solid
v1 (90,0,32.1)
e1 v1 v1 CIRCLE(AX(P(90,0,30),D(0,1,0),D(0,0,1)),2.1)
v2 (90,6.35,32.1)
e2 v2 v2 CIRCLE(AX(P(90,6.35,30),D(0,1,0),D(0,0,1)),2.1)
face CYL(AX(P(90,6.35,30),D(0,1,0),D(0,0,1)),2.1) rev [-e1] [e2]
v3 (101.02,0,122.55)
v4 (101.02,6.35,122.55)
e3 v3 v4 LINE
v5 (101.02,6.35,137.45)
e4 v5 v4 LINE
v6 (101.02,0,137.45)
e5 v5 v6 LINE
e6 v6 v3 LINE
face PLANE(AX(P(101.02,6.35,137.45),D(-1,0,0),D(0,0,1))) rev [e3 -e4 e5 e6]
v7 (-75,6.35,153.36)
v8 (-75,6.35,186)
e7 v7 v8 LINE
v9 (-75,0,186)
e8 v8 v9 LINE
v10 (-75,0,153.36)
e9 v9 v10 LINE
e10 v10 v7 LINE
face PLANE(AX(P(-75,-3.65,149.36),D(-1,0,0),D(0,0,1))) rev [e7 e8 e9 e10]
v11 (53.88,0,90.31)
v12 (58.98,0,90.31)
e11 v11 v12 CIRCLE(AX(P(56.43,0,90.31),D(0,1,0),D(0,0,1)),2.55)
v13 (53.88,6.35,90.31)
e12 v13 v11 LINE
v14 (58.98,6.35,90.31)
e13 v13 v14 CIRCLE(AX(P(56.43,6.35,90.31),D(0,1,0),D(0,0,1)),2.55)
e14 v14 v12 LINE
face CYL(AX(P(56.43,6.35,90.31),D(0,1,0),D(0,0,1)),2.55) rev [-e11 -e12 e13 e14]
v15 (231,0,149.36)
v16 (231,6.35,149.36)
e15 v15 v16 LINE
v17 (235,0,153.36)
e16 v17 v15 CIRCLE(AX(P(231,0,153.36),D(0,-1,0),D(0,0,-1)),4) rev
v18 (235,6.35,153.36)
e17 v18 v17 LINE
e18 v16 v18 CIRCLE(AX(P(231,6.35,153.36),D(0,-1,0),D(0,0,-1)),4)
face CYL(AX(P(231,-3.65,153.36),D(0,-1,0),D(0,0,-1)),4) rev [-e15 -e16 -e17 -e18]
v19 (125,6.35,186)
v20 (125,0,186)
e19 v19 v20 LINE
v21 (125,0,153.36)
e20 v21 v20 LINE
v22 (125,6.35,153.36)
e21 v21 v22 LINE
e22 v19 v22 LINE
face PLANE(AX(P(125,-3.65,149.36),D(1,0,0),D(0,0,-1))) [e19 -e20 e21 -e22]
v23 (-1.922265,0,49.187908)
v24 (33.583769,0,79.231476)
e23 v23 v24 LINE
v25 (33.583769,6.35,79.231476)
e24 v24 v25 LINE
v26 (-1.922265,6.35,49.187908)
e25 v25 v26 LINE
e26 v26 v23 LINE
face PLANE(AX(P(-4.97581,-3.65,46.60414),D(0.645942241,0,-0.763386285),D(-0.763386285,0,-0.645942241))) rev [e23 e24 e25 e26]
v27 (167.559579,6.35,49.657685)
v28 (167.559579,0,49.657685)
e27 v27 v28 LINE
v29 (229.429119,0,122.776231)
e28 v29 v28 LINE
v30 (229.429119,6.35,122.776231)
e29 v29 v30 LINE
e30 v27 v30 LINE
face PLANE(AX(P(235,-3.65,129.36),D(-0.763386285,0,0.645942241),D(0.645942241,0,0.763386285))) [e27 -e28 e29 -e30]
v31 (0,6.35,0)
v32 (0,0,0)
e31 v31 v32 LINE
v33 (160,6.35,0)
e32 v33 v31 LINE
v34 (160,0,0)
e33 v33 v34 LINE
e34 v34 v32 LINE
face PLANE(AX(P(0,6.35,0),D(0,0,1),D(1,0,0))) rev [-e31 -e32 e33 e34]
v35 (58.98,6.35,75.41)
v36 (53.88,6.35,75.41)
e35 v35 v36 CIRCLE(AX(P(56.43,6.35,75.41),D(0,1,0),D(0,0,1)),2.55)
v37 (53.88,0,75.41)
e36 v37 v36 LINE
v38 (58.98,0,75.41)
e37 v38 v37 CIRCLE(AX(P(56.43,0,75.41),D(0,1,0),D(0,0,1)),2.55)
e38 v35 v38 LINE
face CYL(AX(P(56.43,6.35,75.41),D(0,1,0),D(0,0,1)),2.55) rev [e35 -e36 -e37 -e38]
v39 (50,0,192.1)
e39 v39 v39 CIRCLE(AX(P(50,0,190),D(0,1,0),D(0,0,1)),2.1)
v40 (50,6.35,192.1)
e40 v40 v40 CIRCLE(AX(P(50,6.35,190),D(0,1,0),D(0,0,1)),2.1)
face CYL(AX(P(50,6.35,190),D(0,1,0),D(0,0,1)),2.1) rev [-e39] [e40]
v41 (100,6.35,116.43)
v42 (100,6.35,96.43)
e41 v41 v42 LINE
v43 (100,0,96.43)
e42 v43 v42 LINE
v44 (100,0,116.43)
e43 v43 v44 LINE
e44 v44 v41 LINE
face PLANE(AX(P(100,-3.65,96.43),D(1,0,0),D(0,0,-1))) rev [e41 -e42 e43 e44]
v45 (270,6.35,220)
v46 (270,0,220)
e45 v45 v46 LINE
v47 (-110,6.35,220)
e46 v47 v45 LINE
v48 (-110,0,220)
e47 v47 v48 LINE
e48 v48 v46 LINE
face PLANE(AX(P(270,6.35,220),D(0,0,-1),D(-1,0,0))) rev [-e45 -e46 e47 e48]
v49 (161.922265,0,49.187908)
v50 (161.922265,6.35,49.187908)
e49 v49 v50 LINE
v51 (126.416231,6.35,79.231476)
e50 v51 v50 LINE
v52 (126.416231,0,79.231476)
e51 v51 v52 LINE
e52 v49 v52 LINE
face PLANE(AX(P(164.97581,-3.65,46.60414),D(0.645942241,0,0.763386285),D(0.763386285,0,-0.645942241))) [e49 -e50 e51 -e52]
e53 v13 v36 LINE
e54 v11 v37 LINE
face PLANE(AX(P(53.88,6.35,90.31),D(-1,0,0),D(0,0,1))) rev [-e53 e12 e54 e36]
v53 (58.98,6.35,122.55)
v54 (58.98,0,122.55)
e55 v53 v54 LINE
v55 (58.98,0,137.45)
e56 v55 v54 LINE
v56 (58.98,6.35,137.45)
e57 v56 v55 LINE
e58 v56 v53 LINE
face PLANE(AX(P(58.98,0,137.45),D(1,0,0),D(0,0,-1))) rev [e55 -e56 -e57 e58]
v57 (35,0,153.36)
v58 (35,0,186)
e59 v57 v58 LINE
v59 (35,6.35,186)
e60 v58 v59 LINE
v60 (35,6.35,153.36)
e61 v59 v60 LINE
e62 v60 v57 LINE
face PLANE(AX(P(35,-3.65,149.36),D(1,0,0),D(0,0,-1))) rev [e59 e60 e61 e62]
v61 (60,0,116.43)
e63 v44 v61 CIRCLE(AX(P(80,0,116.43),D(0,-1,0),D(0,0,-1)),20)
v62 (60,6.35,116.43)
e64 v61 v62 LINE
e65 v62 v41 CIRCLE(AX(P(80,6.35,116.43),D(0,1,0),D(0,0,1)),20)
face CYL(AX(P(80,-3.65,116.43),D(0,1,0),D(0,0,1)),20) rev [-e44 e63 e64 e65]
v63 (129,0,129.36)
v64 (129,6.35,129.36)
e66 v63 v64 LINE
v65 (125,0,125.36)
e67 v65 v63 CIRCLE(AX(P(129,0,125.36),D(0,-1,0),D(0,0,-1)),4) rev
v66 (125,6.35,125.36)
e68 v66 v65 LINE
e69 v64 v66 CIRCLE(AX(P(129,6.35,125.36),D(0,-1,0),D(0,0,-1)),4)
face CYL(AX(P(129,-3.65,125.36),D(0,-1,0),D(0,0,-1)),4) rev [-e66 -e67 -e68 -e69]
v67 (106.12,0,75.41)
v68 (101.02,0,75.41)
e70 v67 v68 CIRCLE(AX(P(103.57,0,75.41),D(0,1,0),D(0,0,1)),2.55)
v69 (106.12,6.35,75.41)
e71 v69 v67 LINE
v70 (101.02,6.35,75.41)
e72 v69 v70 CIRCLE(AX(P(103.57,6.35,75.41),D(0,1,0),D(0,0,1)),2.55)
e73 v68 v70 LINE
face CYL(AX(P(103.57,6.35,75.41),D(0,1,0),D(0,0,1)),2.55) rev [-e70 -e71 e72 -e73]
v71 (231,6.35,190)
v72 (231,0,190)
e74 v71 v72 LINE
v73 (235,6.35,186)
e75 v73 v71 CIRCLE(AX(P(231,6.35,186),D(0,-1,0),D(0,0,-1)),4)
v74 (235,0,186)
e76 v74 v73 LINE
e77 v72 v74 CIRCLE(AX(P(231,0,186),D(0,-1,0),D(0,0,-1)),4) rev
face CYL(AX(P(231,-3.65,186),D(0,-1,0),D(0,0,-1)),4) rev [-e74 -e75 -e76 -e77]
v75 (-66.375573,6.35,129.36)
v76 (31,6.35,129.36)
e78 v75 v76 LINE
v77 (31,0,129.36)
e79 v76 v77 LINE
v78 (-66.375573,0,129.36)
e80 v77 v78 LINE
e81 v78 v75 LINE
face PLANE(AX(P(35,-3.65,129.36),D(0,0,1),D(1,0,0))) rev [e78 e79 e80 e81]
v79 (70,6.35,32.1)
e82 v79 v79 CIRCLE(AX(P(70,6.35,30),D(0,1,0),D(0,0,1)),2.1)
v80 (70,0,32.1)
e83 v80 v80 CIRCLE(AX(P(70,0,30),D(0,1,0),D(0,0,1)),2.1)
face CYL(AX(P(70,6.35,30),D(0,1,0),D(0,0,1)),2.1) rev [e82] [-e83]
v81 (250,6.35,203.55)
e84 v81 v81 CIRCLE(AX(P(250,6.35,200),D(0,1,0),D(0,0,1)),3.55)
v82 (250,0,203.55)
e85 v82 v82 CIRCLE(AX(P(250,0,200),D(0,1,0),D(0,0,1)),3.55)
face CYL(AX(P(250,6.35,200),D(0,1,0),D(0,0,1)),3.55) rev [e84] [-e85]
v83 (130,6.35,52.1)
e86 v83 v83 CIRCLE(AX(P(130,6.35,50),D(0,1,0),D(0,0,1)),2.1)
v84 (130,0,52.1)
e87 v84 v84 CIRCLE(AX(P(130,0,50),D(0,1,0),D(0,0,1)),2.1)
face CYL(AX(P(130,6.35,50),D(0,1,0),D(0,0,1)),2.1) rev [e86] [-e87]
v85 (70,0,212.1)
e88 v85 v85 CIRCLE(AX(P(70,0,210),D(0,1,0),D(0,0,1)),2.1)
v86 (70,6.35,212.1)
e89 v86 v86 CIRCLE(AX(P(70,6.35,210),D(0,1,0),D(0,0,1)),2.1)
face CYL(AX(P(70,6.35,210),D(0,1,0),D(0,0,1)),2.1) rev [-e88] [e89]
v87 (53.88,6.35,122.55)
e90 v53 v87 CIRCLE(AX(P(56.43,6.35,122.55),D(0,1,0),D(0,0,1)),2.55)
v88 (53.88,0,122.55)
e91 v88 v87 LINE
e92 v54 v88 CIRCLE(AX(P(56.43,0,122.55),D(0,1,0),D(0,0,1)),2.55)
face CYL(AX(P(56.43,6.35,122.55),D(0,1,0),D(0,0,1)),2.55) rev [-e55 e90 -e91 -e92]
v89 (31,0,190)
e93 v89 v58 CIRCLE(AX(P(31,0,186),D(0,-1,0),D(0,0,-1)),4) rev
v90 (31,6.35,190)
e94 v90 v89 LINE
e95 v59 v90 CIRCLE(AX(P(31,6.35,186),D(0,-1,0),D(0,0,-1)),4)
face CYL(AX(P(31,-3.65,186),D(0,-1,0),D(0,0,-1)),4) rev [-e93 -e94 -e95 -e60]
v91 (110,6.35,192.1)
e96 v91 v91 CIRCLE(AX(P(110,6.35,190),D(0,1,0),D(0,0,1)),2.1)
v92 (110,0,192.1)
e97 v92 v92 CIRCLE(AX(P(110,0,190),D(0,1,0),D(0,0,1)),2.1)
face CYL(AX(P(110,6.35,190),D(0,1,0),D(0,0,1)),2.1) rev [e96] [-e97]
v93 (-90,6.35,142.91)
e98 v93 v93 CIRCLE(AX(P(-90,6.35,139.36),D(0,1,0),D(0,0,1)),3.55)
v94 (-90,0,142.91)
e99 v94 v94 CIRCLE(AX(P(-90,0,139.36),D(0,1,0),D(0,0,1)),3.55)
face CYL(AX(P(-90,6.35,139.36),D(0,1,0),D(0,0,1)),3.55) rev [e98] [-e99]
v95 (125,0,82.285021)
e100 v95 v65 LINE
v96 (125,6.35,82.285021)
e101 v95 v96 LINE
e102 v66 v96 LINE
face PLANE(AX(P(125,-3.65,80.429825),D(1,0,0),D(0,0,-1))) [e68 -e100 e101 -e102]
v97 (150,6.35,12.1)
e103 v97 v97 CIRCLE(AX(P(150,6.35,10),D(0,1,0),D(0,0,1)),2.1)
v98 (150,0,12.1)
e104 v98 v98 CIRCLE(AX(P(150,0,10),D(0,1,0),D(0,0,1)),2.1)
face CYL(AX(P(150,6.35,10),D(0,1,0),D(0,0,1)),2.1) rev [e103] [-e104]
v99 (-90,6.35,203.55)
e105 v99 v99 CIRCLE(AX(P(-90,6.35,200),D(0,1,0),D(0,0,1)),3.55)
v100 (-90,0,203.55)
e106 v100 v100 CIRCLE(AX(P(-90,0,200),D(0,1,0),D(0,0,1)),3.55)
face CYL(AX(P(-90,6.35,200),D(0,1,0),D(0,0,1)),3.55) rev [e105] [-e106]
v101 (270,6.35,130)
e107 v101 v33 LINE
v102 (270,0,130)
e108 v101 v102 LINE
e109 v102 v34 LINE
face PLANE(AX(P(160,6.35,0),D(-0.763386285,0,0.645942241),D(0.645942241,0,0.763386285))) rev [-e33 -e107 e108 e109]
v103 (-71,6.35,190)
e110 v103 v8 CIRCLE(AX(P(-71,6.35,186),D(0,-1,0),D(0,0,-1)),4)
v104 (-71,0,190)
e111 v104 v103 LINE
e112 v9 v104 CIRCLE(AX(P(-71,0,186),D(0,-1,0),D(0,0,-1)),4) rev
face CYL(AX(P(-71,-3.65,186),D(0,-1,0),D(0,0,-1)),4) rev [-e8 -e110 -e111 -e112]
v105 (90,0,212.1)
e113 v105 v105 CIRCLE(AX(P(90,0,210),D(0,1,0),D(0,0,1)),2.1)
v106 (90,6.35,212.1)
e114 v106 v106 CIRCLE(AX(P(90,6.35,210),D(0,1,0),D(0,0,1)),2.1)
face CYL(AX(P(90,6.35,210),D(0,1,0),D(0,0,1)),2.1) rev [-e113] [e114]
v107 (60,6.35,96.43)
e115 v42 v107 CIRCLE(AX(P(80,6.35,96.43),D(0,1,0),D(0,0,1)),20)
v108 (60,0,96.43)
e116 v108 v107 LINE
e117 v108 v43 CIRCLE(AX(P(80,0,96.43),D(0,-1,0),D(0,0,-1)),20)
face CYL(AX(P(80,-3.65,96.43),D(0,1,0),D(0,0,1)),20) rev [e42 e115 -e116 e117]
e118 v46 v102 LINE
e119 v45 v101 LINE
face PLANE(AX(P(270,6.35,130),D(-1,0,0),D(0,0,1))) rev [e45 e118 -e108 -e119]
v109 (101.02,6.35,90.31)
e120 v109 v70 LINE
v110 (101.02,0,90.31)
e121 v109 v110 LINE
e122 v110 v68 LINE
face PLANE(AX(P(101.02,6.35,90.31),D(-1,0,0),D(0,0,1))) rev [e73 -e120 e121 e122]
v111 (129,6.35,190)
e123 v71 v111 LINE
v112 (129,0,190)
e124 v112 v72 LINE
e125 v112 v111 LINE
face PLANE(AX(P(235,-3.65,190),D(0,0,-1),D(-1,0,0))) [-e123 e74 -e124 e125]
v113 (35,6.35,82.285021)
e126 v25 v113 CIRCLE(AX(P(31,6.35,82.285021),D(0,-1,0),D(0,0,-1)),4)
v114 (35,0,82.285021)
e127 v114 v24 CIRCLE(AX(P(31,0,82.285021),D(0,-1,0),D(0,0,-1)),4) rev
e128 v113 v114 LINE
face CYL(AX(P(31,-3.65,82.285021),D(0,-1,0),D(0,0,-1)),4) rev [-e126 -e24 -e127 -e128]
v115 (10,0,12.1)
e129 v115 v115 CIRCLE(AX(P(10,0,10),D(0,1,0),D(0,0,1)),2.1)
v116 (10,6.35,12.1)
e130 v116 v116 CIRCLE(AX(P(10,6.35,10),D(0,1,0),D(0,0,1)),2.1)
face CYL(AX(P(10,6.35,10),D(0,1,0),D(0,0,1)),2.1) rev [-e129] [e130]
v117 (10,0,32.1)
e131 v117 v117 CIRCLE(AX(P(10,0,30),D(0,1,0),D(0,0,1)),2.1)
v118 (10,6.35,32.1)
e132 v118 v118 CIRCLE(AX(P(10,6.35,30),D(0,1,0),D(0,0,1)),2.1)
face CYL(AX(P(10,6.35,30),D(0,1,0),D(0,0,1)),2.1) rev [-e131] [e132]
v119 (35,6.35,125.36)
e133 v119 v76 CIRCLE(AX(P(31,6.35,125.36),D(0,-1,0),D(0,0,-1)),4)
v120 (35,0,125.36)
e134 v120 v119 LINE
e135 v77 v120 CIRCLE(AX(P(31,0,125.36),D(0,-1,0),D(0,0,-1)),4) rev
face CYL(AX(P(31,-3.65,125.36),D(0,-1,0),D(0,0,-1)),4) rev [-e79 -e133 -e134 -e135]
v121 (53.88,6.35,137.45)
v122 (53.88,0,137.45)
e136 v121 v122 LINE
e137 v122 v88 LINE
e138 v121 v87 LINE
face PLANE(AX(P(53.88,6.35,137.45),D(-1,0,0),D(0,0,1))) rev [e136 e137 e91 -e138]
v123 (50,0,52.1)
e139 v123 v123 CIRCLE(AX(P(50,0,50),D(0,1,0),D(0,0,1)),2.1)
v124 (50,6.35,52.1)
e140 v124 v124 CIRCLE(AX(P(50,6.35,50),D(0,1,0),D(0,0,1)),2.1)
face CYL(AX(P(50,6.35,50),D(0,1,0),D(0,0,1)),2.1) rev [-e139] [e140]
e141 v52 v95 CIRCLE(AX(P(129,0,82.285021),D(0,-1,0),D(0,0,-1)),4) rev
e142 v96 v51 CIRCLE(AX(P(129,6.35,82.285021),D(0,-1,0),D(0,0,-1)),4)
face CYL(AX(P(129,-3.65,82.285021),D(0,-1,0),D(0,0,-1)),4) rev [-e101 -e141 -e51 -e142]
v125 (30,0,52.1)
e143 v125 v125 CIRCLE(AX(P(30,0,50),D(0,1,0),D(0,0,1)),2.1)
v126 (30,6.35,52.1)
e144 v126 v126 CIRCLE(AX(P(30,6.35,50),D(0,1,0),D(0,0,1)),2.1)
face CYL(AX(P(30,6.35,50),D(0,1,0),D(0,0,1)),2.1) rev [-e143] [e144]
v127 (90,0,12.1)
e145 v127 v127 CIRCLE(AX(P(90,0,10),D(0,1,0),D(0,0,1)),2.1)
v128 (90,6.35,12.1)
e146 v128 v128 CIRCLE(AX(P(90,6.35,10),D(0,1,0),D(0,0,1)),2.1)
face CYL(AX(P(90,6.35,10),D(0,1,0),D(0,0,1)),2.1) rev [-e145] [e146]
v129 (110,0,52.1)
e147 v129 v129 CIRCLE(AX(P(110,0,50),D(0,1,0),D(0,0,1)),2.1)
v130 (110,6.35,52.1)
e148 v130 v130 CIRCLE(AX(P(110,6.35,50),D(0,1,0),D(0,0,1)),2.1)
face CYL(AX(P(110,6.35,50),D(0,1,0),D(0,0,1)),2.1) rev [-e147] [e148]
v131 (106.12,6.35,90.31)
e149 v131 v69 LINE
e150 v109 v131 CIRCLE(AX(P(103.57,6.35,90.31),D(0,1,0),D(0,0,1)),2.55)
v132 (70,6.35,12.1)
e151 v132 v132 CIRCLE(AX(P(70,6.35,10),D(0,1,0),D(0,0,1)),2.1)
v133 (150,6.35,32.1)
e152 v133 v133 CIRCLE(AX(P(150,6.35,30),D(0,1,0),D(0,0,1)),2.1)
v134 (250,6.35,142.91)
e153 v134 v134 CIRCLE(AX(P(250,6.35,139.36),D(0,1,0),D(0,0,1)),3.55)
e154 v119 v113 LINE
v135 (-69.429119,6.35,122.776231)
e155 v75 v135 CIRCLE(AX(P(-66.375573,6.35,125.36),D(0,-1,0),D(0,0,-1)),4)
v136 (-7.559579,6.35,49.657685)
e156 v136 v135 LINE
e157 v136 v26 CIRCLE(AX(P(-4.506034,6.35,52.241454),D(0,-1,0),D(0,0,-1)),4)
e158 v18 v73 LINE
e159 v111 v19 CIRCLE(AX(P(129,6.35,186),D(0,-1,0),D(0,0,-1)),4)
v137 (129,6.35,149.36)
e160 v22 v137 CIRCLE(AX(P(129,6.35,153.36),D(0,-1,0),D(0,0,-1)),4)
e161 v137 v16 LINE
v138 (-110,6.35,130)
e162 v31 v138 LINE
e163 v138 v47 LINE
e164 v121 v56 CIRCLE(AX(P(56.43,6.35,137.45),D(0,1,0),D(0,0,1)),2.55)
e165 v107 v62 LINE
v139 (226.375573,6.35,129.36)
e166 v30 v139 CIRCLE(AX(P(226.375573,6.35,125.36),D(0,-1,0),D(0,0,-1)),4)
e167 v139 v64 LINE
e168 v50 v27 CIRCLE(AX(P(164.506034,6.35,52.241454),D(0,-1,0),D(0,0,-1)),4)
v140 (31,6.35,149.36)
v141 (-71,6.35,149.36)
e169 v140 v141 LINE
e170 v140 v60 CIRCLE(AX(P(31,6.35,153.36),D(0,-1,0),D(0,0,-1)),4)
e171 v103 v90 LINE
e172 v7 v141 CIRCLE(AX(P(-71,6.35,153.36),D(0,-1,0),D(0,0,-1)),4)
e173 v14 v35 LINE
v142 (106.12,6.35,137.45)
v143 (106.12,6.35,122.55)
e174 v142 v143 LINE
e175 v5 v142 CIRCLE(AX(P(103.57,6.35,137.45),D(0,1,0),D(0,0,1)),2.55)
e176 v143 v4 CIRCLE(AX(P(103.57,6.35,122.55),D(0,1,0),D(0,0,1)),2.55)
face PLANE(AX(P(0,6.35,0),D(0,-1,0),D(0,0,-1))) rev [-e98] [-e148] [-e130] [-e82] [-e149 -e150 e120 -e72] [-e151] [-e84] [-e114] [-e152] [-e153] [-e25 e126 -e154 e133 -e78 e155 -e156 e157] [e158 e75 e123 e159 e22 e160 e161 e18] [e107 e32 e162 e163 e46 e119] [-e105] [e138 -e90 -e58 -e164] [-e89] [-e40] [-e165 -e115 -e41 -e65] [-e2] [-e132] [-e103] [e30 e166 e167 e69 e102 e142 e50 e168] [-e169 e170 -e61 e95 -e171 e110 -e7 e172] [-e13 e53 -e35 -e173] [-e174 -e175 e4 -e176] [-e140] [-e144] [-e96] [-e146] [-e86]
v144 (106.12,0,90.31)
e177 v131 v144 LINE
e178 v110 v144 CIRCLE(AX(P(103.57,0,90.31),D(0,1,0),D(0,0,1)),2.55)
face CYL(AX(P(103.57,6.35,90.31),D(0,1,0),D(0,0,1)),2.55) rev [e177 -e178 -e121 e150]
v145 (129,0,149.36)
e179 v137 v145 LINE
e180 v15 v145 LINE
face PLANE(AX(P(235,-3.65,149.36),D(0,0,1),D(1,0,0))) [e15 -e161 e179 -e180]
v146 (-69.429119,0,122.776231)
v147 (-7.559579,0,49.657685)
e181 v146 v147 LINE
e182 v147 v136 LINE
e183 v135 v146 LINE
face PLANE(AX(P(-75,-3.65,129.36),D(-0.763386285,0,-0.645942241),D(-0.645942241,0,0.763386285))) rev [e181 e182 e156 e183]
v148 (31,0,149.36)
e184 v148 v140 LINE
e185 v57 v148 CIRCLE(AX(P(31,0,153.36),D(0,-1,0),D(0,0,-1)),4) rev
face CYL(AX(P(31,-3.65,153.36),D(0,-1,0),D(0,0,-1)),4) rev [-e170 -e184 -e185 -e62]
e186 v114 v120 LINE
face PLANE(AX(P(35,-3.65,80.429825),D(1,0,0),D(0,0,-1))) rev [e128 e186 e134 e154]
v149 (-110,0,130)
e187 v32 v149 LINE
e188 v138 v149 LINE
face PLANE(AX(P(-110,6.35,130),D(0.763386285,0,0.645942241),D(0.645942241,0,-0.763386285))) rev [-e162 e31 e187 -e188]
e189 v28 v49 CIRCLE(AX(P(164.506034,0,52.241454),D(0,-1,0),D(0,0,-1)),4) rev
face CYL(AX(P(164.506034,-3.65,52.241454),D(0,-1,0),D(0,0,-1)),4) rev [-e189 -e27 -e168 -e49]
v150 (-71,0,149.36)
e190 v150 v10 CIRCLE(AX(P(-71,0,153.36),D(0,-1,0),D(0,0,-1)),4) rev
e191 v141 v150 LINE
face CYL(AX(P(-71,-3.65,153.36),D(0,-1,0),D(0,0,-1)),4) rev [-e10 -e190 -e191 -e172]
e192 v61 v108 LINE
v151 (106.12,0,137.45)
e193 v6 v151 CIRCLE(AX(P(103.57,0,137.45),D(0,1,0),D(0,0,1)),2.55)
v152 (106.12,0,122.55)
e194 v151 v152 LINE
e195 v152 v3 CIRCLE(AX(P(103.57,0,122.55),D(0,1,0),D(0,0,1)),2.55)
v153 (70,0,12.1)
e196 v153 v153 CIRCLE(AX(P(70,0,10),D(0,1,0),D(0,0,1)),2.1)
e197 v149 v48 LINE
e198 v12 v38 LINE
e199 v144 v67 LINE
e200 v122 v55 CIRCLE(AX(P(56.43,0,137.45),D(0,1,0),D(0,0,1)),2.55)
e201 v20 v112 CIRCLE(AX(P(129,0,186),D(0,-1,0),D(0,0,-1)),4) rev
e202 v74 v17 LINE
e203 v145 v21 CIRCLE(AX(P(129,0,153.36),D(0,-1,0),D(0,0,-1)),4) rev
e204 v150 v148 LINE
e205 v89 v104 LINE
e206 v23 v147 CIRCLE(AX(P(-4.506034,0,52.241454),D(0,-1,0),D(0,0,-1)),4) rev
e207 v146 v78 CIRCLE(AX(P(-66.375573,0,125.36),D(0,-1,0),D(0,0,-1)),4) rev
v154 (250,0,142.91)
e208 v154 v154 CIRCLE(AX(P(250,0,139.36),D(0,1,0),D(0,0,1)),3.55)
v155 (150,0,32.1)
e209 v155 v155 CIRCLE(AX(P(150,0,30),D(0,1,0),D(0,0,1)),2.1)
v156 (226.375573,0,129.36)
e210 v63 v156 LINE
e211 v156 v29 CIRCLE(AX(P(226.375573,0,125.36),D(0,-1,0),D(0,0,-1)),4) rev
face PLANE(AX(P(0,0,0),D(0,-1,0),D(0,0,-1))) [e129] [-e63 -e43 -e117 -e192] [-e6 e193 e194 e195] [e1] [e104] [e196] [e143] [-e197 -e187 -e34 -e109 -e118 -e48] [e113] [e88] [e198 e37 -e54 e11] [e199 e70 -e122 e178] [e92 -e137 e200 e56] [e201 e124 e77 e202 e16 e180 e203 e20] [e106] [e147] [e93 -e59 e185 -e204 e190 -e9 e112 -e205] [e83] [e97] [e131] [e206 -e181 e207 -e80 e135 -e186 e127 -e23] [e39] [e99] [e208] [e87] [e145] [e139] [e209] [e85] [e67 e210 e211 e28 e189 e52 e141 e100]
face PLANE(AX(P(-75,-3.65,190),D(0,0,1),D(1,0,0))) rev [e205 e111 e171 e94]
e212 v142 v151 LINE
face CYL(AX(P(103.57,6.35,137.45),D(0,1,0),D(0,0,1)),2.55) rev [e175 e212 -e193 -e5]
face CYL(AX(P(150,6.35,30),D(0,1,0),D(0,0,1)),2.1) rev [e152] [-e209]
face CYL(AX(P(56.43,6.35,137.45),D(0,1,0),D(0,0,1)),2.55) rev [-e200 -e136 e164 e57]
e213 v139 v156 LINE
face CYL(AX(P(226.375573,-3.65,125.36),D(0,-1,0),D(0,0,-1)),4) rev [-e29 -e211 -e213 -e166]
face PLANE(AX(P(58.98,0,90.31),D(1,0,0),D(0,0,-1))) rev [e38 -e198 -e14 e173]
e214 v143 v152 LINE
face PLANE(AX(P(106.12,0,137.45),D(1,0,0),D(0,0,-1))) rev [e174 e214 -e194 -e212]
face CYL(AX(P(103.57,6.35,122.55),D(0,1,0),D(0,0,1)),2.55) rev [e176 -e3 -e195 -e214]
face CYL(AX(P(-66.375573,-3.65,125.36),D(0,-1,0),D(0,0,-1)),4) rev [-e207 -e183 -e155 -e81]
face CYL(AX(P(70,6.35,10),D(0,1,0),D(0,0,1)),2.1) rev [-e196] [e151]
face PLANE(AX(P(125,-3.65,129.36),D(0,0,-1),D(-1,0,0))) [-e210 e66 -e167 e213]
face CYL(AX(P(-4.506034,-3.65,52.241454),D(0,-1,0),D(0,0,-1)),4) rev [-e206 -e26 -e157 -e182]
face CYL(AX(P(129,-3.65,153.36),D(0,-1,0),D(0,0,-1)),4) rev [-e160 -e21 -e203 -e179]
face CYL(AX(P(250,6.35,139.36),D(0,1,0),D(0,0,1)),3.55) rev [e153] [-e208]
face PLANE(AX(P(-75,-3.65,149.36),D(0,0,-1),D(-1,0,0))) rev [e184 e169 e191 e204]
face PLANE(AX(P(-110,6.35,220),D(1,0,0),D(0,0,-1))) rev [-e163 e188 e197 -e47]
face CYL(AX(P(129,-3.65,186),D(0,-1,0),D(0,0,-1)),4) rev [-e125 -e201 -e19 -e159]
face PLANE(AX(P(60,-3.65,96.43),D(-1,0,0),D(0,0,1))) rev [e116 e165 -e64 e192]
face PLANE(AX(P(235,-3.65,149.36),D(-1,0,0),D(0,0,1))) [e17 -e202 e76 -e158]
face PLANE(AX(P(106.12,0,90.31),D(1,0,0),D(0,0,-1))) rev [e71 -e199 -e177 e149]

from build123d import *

# Parameters (mm, degrees)
BOSS_EXTRUDE1_DEPTH                 = 6.35
M5X0_8_TAPPED_HOLE1_D               = 4.2
F_7_1_7_1_DIAMETER_HOLE1_D          = 7.1
F_5_0MM_CLEARANCE_DOWEL_SLOT2_DEPTH = 6.35
CUT_EXTRUDE1_DEPTH                  = 10
SKETCH18_W                          = 110
SKETCH18_H                          = 40.64
CUT_EXTRUDE2_DEPTH                  = 10
FILLET1_R                           = 4
FILLET1_OF_MIRROR1_R                = 4


# Read off the part's stored shape, not the designer's step: Ø5.0mm Clearance Dowel Slot2
with BuildPart() as part:
    # Sketch1 → Boss-Extrude1 (new body)
    with BuildSketch(Plane(origin=(0, 0, 0), x_dir=(1, 0, 0), z_dir=(0, 1, 0))):
        Polygon((0, 0), (160, 0), (270, -130), (270, -220), (-110, -220), (-110, -130), align=None)
    extrude(amount=BOSS_EXTRUDE1_DEPTH)

    # M5x0.8 Tapped Hole1 (through all)
    with Locations(Plane(origin=(0, 6.35, 0), x_dir=(1, 0, 0), z_dir=(0, 1, 0))):
        with Locations((10, -10), (150, -10), (150, -30), (10, -30), (30, -50), (50, -50), (110, -50), (130, -50), (90, -10), (90, -30), (70, -10), (70, -30), (70, -210), (90, -210), (50, -190), (110, -190)):
            Hole(M5X0_8_TAPPED_HOLE1_D / 2)

    # Ø7.1 (7.1) Diameter Hole1 (through all)
    with Locations(Plane(origin=(0, 6.35, 0), x_dir=(1, 0, 0), z_dir=(0, 1, 0))):
        with Locations((250, -139.36), (250, -200), (-90, -200), (-90, -139.36)):
            Hole(F_7_1_7_1_DIAMETER_HOLE1_D / 2)

    # Ø5.0mm Clearance Dowel Slot2 outline → Ø5.0mm Clearance Dowel Slot2 (cut)
    with BuildSketch(Plane(origin=(0, 0, 0), x_dir=(1, 0, 0), z_dir=(0, 1, 0))):
        with BuildLine():
            Line((58.98, -90.31), (58.98, -75.41))
            ThreePointArc((58.98, -75.41), (56.43, -72.86), (53.88, -75.41))
            Line((53.88, -75.41), (53.88, -90.31))
            ThreePointArc((53.88, -90.31), (56.43, -92.86), (58.98, -90.31))
        make_face()
        with BuildLine():
            ThreePointArc((58.98, -122.55), (56.43, -120), (53.88, -122.55))
            Line((53.88, -122.55), (53.88, -137.45))
            ThreePointArc((53.88, -137.45), (56.43, -140), (58.98, -137.45))
            Line((58.98, -137.45), (58.98, -122.55))
        make_face()
        with BuildLine():
            Line((106.12, -90.31), (106.12, -75.41))
            ThreePointArc((106.12, -75.41), (103.57, -72.86), (101.02, -75.41))
            Line((101.02, -75.41), (101.02, -90.31))
            ThreePointArc((101.02, -90.31), (103.57, -92.86), (106.12, -90.31))
        make_face()
        with BuildLine():
            ThreePointArc((106.12, -122.55), (103.57, -120), (101.02, -122.55))
            Line((101.02, -122.55), (101.02, -137.45))
            ThreePointArc((101.02, -137.45), (103.57, -140), (106.12, -137.45))
            Line((106.12, -137.45), (106.12, -122.55))
        make_face()
    extrude(amount=F_5_0MM_CLEARANCE_DOWEL_SLOT2_DEPTH, mode=Mode.SUBTRACT)

    # Sketch17 → Cut-Extrude1 (cut)
    with BuildSketch(Plane(origin=(0, 6.35, 0), x_dir=(1, 0, 0), z_dir=(0, 1, 0))):
        with BuildLine():
            Line((100, -96.43), (100, -116.43))
            ThreePointArc((100, -116.43), (80, -136.43), (60, -116.43))
            Line((60, -116.43), (60, -96.43))
            ThreePointArc((60, -96.43), (80, -76.43), (100, -96.43))
        make_face()
    extrude(amount=-CUT_EXTRUDE1_DEPTH, mode=Mode.SUBTRACT)

    # Sketch18 → Cut-Extrude2 (cut)
    with BuildSketch(Plane(origin=(0, 6.35, 0), x_dir=(1, 0, 0), z_dir=(0, 1, 0))):
        Polygon((-75, -129.36), (-4.975810347, -46.6041395), (35, -80.429825178), (35, -129.36), align=None)
        with Locations((-20, -169.68)):
            Rectangle(SKETCH18_W, SKETCH18_H)
    cut_extrude2 = extrude(amount=-CUT_EXTRUDE2_DEPTH, mode=Mode.SUBTRACT)

    # Fillet1
    fillet1_edges = [part.edges().sort_by_distance(p)[0] for p in [
        (-75, 3.175, 190),
        (-75, 3.175, 149.36),
        (35, 3.175, 149.36),
        (35, 3.175, 190),
        (35, 3.175, 129.36),
        (-75, 3.175, 129.36),
        (-4.975810347, 3.175, 46.6041395),
        (35, 3.175, 80.429825178),
    ]]
    fillet(fillet1_edges, radius=FILLET1_R)

    # Mirror1: Cut-Extrude2 across plane
    add(cut_extrude2.mirror(Plane.ZY.offset(-80)), mode=Mode.SUBTRACT)

    # Fillet1 of Mirror1
    fillet1_of_mirror1_edges = [part.edges().sort_by_distance(p)[0] for p in [
        (235, 3.175, 190),
        (235, 3.175, 149.36),
        (125, 3.175, 149.36),
        (125, 3.175, 190),
        (125, 3.175, 129.36),
        (235, 3.175, 129.36),
        (164.975810347, 3.175, 46.6041395),
        (125, 3.175, 80.429825178),
    ]]
    fillet(fillet1_of_mirror1_edges, radius=FILLET1_OF_MIRROR1_R)


solid = part.part
